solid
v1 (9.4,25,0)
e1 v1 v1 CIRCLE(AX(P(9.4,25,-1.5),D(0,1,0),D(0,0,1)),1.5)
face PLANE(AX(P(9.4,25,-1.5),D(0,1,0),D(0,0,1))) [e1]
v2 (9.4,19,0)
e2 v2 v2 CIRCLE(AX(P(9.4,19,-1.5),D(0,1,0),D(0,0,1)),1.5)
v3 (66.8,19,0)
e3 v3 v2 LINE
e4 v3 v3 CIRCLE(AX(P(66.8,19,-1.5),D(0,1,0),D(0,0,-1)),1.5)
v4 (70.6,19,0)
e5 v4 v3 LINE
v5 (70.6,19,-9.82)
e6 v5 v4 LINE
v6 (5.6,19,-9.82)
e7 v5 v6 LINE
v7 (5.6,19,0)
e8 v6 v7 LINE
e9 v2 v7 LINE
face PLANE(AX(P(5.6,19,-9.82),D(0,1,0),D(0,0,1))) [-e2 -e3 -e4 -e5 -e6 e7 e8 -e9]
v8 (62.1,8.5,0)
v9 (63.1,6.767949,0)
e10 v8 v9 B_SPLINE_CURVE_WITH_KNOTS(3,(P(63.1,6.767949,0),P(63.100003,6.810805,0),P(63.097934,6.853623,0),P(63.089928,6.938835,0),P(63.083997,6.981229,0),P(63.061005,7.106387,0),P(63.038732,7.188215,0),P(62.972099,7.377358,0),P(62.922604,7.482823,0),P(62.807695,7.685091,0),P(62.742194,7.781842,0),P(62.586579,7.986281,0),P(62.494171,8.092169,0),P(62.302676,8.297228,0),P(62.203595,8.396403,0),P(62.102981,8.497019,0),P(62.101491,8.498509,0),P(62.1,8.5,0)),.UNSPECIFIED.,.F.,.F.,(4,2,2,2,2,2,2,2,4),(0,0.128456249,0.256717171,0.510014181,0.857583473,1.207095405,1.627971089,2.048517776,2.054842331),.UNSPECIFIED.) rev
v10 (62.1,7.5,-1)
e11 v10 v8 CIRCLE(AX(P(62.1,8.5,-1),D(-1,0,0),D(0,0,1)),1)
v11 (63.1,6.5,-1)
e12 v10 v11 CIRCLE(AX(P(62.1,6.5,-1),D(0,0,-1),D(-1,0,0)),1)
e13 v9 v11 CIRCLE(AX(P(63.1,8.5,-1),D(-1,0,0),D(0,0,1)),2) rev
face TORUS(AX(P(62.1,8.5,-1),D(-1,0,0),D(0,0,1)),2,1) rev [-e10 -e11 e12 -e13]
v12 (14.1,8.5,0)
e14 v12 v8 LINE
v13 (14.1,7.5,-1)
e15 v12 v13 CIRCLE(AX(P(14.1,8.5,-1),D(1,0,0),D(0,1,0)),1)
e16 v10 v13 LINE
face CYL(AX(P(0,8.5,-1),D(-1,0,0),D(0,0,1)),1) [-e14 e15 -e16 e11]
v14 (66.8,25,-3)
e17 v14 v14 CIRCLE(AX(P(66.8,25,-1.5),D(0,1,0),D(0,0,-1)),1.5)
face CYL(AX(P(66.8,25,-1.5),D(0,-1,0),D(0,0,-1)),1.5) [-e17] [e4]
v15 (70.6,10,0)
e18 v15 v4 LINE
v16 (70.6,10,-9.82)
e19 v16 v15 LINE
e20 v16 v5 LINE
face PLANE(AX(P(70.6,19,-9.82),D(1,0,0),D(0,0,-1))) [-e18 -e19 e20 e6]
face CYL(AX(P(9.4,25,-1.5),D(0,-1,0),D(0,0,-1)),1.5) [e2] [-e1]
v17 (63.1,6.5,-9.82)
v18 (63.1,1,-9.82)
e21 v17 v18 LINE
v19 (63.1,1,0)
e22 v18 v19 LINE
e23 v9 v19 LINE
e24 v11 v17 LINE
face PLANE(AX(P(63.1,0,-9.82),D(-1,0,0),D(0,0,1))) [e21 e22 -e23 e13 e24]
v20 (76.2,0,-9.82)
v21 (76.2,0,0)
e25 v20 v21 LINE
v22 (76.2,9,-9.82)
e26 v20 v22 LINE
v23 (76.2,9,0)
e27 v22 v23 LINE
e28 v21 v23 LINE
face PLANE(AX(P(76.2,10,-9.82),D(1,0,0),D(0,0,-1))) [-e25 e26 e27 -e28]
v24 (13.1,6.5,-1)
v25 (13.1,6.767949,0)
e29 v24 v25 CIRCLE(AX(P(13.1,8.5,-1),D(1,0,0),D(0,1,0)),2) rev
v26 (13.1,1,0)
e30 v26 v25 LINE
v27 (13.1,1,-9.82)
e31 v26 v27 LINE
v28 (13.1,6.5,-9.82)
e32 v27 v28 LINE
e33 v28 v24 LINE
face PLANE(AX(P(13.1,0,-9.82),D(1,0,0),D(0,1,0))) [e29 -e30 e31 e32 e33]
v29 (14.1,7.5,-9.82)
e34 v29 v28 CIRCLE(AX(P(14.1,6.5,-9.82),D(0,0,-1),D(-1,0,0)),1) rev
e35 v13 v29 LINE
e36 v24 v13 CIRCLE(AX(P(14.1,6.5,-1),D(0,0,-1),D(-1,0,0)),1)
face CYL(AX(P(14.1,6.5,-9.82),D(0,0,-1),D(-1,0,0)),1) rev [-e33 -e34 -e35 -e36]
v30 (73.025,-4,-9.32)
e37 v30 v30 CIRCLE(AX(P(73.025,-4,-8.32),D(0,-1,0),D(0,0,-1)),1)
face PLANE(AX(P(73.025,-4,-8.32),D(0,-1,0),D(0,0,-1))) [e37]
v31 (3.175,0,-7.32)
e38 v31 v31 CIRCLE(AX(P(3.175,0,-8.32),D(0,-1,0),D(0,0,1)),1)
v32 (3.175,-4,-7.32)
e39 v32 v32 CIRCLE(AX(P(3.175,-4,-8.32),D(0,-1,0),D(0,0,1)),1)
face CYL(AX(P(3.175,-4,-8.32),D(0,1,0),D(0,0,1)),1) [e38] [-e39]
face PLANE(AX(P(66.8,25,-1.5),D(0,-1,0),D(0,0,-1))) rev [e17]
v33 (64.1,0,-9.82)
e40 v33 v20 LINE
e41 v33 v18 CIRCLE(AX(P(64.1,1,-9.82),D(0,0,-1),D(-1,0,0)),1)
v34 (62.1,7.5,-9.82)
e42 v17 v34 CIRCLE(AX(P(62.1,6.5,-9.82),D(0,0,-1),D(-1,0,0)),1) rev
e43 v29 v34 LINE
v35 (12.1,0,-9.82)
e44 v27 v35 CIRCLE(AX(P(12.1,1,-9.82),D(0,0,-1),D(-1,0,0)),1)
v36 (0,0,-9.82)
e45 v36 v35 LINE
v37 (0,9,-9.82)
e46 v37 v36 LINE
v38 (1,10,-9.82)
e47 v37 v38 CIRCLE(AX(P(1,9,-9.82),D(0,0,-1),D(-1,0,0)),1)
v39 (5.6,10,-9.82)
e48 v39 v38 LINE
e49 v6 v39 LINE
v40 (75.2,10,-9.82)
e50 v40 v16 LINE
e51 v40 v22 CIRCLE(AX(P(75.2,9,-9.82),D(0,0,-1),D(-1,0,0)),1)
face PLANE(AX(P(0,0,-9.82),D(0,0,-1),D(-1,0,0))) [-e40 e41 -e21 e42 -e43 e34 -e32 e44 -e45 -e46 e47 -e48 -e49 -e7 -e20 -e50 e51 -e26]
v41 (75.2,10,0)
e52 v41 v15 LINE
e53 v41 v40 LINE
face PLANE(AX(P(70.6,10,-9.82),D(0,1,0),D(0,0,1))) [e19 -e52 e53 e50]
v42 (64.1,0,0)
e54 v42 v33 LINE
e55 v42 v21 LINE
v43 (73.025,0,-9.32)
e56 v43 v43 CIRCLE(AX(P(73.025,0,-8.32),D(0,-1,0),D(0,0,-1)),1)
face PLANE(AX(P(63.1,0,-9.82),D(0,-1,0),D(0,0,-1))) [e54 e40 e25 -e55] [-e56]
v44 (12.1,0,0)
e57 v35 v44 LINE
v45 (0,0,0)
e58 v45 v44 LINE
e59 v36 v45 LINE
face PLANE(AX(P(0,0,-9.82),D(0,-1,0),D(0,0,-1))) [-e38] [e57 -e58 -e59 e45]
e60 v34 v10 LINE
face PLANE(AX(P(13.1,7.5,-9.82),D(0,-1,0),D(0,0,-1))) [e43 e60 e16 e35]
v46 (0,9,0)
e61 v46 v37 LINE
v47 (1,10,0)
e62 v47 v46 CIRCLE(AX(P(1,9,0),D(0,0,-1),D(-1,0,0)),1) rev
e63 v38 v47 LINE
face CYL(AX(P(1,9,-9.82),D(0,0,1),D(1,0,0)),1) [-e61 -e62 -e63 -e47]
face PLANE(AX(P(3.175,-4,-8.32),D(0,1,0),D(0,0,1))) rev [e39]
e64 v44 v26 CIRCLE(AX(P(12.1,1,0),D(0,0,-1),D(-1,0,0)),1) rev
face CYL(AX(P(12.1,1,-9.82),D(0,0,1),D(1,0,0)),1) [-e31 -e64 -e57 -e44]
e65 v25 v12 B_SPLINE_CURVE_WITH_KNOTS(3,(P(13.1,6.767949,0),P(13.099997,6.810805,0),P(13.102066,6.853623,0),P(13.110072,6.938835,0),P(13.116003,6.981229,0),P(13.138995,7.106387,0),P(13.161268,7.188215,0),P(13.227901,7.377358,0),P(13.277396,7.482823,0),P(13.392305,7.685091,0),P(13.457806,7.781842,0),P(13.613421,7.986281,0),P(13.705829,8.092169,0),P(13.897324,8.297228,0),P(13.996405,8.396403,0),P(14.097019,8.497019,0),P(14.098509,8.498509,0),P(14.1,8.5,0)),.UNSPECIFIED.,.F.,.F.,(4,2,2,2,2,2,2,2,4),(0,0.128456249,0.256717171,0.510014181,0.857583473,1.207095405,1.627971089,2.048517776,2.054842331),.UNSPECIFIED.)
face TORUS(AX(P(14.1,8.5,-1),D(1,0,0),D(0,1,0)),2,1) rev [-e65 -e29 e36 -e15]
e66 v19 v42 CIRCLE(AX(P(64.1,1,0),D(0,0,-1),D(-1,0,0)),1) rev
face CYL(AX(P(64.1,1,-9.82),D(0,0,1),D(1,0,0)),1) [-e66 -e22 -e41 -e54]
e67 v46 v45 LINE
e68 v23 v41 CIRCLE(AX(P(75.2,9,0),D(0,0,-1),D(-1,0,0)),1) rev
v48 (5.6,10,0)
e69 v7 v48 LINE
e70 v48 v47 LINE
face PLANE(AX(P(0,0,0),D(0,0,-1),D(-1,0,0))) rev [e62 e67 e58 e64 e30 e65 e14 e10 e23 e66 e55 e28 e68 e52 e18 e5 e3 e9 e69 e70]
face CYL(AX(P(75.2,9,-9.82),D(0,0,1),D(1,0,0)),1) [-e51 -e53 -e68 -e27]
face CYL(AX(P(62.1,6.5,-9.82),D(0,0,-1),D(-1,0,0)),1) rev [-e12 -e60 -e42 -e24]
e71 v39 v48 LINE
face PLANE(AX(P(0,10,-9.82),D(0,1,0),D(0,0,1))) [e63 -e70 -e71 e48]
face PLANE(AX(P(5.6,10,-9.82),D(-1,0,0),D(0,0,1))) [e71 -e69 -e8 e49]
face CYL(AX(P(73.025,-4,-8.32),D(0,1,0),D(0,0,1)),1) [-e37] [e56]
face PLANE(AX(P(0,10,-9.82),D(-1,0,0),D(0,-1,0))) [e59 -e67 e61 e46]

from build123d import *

# Parameters (mm, degrees)
BOSS_EXTRUDE1_DEPTH = 9.82
SKETCH3_R           = 1.5
BOSS_EXTRUDE2_DEPTH = 6
SKETCH5_R           = 1
BOSS_EXTRUDE3_DEPTH = 4
FILLET1_R           = 1
FILLET3_R           = 1


with BuildPart() as part:
    # Sketch2 → Boss-Extrude1 (new body)
    with BuildSketch(Plane.XY):
        Polygon((0, 10), (5.6, 10), (5.6, 19), (70.6, 19), (70.6, 10), (76.2, 10), (76.2, 0), (63.1, 0), (63.1, 7.5), (13.1, 7.5), (13.1, 0), (0, 0), align=None)
    extrude(amount=-BOSS_EXTRUDE1_DEPTH)

    # Sketch3 → Boss-Extrude2 (add)
    with BuildSketch(Plane(origin=(0, 19, 0), x_dir=(1, 0, 0), z_dir=(0, 1, 0))):
        with Locations(Location((9.4, 1.5, 0), (0, 0, 270))):
            Circle(SKETCH3_R)
        with Locations(Location((66.8, 1.5, 0), (0, 0, 90))):
            Circle(SKETCH3_R)
    extrude(amount=BOSS_EXTRUDE2_DEPTH)

    # Sketch5 → Boss-Extrude3 (add)
    with BuildSketch(Plane.XZ):
        with Locations(Location((73.025, -8.32, 0), (0, 0, 270))):
            Circle(SKETCH5_R)
        with Locations(Location((3.175, -8.32, 0), (0, 0, 90))):
            Circle(SKETCH5_R)
    extrude(amount=BOSS_EXTRUDE3_DEPTH)

    # Fillet1
    fillet1_edges = [part.edges().sort_by_distance(p)[0] for p in [
        (38.1, 7.5, 0),
    ]]
    fillet(fillet1_edges, radius=FILLET1_R)

    # Fillet3
    # the kernel refuses this fillet: 1 mm, written as the material it adds along each edge
    with BuildSketch(Plane(origin=(63.1, 7.5, -1), x_dir=(-1, 0, 0), z_dir=(0, 0, -1))) as fillet3_piece_1:
        with BuildLine():
            CenterArc((FILLET3_R, -FILLET3_R), FILLET3_R, 90, 90)
            Line((0, -FILLET3_R), (0, 0))
            Line((0, 0), (FILLET3_R, 0))
        make_face()
    extrude(amount=8.82)
    with BuildSketch(Plane(origin=(13.1, 7.5, -1), x_dir=(1, 0, 0), z_dir=(0, 0, -1))) as fillet3_piece_2:
        with BuildLine():
            CenterArc((FILLET3_R, FILLET3_R), FILLET3_R, 180, 90)
            Line((0, FILLET3_R), (0, 0))
            Line((0, 0), (FILLET3_R, 0))
        make_face()
    extrude(amount=8.82)
    with BuildSketch(Plane(origin=(63.1, 8.5, -1), x_dir=(0, 0.5976672776328268, -0.8017442392976488), z_dir=(0, -0.8017442392976488, -0.5976672776328268))) as fillet3_piece_3_section:
        with BuildLine():
            CenterArc((1 + FILLET3_R, -FILLET3_R), FILLET3_R, 90, 90)
            Line((1 + FILLET3_R, 0), (1, 0))
            Line((1, 0), (1, -FILLET3_R))
        make_face()
    fillet3_piece_3 = revolve(axis=Axis((63.1, 8.5, -1), (1, 0, 0)), revolution_arc=233.296989237, mode=Mode.PRIVATE)
    fillet3_piece_3 = split(fillet3_piece_3, bisect_by=Plane(origin=(62.788371694, 7.750061053, 0), z_dir=(0, 0, -1)), keep=Keep.TOP, mode=Mode.PRIVATE)
    add(fillet3_piece_3)
    with BuildSketch(Plane(origin=(13.1, 8.5, -1), x_dir=(0, 0.5976672776328246, -0.8017442392976504), z_dir=(0, -0.8017442392976504, -0.5976672776328246))) as fillet3_piece_4_section:
        with BuildLine():
            CenterArc((1 + FILLET3_R, FILLET3_R), FILLET3_R, 180, 90)
            Line((1, FILLET3_R), (1, 0))
            Line((1, 0), (1 + FILLET3_R, 0))
        make_face()
    fillet3_piece_4 = revolve(axis=Axis((13.1, 8.5, -1), (1, 0, 0)), revolution_arc=233.296989237, mode=Mode.PRIVATE)
    fillet3_piece_4 = split(fillet3_piece_4, bisect_by=Plane(origin=(13.411628296, 7.750061029, 0), z_dir=(0, 0, -1)), keep=Keep.TOP, mode=Mode.PRIVATE)
    add(fillet3_piece_4)
    # the kernel refuses this fillet: 1 mm, written as the material it takes off along each edge
    with BuildSketch(Plane(origin=(63.1, 0, 2.5), x_dir=(0, 1, 0), z_dir=(0, 0, -1)), Plane(origin=(13.1, 0, 2.5), x_dir=(-1, 0, 0), z_dir=(0, 0, -1)), Plane(origin=(0, 10, 2.5), x_dir=(1, 0, 0), z_dir=(0, 0, -1)), Plane(origin=(76.2, 10, 2.5), x_dir=(0, -1, 0), z_dir=(0, 0, -1))) as fillet3_2_piece_1:
        with BuildLine():
            CenterArc((FILLET3_R, FILLET3_R), FILLET3_R, 180, 90)
            Line((0, FILLET3_R), (0, 0))
            Line((0, 0), (FILLET3_R, 0))
        make_face()
    extrude(amount=14.82, mode=Mode.SUBTRACT)


solid = part.part
